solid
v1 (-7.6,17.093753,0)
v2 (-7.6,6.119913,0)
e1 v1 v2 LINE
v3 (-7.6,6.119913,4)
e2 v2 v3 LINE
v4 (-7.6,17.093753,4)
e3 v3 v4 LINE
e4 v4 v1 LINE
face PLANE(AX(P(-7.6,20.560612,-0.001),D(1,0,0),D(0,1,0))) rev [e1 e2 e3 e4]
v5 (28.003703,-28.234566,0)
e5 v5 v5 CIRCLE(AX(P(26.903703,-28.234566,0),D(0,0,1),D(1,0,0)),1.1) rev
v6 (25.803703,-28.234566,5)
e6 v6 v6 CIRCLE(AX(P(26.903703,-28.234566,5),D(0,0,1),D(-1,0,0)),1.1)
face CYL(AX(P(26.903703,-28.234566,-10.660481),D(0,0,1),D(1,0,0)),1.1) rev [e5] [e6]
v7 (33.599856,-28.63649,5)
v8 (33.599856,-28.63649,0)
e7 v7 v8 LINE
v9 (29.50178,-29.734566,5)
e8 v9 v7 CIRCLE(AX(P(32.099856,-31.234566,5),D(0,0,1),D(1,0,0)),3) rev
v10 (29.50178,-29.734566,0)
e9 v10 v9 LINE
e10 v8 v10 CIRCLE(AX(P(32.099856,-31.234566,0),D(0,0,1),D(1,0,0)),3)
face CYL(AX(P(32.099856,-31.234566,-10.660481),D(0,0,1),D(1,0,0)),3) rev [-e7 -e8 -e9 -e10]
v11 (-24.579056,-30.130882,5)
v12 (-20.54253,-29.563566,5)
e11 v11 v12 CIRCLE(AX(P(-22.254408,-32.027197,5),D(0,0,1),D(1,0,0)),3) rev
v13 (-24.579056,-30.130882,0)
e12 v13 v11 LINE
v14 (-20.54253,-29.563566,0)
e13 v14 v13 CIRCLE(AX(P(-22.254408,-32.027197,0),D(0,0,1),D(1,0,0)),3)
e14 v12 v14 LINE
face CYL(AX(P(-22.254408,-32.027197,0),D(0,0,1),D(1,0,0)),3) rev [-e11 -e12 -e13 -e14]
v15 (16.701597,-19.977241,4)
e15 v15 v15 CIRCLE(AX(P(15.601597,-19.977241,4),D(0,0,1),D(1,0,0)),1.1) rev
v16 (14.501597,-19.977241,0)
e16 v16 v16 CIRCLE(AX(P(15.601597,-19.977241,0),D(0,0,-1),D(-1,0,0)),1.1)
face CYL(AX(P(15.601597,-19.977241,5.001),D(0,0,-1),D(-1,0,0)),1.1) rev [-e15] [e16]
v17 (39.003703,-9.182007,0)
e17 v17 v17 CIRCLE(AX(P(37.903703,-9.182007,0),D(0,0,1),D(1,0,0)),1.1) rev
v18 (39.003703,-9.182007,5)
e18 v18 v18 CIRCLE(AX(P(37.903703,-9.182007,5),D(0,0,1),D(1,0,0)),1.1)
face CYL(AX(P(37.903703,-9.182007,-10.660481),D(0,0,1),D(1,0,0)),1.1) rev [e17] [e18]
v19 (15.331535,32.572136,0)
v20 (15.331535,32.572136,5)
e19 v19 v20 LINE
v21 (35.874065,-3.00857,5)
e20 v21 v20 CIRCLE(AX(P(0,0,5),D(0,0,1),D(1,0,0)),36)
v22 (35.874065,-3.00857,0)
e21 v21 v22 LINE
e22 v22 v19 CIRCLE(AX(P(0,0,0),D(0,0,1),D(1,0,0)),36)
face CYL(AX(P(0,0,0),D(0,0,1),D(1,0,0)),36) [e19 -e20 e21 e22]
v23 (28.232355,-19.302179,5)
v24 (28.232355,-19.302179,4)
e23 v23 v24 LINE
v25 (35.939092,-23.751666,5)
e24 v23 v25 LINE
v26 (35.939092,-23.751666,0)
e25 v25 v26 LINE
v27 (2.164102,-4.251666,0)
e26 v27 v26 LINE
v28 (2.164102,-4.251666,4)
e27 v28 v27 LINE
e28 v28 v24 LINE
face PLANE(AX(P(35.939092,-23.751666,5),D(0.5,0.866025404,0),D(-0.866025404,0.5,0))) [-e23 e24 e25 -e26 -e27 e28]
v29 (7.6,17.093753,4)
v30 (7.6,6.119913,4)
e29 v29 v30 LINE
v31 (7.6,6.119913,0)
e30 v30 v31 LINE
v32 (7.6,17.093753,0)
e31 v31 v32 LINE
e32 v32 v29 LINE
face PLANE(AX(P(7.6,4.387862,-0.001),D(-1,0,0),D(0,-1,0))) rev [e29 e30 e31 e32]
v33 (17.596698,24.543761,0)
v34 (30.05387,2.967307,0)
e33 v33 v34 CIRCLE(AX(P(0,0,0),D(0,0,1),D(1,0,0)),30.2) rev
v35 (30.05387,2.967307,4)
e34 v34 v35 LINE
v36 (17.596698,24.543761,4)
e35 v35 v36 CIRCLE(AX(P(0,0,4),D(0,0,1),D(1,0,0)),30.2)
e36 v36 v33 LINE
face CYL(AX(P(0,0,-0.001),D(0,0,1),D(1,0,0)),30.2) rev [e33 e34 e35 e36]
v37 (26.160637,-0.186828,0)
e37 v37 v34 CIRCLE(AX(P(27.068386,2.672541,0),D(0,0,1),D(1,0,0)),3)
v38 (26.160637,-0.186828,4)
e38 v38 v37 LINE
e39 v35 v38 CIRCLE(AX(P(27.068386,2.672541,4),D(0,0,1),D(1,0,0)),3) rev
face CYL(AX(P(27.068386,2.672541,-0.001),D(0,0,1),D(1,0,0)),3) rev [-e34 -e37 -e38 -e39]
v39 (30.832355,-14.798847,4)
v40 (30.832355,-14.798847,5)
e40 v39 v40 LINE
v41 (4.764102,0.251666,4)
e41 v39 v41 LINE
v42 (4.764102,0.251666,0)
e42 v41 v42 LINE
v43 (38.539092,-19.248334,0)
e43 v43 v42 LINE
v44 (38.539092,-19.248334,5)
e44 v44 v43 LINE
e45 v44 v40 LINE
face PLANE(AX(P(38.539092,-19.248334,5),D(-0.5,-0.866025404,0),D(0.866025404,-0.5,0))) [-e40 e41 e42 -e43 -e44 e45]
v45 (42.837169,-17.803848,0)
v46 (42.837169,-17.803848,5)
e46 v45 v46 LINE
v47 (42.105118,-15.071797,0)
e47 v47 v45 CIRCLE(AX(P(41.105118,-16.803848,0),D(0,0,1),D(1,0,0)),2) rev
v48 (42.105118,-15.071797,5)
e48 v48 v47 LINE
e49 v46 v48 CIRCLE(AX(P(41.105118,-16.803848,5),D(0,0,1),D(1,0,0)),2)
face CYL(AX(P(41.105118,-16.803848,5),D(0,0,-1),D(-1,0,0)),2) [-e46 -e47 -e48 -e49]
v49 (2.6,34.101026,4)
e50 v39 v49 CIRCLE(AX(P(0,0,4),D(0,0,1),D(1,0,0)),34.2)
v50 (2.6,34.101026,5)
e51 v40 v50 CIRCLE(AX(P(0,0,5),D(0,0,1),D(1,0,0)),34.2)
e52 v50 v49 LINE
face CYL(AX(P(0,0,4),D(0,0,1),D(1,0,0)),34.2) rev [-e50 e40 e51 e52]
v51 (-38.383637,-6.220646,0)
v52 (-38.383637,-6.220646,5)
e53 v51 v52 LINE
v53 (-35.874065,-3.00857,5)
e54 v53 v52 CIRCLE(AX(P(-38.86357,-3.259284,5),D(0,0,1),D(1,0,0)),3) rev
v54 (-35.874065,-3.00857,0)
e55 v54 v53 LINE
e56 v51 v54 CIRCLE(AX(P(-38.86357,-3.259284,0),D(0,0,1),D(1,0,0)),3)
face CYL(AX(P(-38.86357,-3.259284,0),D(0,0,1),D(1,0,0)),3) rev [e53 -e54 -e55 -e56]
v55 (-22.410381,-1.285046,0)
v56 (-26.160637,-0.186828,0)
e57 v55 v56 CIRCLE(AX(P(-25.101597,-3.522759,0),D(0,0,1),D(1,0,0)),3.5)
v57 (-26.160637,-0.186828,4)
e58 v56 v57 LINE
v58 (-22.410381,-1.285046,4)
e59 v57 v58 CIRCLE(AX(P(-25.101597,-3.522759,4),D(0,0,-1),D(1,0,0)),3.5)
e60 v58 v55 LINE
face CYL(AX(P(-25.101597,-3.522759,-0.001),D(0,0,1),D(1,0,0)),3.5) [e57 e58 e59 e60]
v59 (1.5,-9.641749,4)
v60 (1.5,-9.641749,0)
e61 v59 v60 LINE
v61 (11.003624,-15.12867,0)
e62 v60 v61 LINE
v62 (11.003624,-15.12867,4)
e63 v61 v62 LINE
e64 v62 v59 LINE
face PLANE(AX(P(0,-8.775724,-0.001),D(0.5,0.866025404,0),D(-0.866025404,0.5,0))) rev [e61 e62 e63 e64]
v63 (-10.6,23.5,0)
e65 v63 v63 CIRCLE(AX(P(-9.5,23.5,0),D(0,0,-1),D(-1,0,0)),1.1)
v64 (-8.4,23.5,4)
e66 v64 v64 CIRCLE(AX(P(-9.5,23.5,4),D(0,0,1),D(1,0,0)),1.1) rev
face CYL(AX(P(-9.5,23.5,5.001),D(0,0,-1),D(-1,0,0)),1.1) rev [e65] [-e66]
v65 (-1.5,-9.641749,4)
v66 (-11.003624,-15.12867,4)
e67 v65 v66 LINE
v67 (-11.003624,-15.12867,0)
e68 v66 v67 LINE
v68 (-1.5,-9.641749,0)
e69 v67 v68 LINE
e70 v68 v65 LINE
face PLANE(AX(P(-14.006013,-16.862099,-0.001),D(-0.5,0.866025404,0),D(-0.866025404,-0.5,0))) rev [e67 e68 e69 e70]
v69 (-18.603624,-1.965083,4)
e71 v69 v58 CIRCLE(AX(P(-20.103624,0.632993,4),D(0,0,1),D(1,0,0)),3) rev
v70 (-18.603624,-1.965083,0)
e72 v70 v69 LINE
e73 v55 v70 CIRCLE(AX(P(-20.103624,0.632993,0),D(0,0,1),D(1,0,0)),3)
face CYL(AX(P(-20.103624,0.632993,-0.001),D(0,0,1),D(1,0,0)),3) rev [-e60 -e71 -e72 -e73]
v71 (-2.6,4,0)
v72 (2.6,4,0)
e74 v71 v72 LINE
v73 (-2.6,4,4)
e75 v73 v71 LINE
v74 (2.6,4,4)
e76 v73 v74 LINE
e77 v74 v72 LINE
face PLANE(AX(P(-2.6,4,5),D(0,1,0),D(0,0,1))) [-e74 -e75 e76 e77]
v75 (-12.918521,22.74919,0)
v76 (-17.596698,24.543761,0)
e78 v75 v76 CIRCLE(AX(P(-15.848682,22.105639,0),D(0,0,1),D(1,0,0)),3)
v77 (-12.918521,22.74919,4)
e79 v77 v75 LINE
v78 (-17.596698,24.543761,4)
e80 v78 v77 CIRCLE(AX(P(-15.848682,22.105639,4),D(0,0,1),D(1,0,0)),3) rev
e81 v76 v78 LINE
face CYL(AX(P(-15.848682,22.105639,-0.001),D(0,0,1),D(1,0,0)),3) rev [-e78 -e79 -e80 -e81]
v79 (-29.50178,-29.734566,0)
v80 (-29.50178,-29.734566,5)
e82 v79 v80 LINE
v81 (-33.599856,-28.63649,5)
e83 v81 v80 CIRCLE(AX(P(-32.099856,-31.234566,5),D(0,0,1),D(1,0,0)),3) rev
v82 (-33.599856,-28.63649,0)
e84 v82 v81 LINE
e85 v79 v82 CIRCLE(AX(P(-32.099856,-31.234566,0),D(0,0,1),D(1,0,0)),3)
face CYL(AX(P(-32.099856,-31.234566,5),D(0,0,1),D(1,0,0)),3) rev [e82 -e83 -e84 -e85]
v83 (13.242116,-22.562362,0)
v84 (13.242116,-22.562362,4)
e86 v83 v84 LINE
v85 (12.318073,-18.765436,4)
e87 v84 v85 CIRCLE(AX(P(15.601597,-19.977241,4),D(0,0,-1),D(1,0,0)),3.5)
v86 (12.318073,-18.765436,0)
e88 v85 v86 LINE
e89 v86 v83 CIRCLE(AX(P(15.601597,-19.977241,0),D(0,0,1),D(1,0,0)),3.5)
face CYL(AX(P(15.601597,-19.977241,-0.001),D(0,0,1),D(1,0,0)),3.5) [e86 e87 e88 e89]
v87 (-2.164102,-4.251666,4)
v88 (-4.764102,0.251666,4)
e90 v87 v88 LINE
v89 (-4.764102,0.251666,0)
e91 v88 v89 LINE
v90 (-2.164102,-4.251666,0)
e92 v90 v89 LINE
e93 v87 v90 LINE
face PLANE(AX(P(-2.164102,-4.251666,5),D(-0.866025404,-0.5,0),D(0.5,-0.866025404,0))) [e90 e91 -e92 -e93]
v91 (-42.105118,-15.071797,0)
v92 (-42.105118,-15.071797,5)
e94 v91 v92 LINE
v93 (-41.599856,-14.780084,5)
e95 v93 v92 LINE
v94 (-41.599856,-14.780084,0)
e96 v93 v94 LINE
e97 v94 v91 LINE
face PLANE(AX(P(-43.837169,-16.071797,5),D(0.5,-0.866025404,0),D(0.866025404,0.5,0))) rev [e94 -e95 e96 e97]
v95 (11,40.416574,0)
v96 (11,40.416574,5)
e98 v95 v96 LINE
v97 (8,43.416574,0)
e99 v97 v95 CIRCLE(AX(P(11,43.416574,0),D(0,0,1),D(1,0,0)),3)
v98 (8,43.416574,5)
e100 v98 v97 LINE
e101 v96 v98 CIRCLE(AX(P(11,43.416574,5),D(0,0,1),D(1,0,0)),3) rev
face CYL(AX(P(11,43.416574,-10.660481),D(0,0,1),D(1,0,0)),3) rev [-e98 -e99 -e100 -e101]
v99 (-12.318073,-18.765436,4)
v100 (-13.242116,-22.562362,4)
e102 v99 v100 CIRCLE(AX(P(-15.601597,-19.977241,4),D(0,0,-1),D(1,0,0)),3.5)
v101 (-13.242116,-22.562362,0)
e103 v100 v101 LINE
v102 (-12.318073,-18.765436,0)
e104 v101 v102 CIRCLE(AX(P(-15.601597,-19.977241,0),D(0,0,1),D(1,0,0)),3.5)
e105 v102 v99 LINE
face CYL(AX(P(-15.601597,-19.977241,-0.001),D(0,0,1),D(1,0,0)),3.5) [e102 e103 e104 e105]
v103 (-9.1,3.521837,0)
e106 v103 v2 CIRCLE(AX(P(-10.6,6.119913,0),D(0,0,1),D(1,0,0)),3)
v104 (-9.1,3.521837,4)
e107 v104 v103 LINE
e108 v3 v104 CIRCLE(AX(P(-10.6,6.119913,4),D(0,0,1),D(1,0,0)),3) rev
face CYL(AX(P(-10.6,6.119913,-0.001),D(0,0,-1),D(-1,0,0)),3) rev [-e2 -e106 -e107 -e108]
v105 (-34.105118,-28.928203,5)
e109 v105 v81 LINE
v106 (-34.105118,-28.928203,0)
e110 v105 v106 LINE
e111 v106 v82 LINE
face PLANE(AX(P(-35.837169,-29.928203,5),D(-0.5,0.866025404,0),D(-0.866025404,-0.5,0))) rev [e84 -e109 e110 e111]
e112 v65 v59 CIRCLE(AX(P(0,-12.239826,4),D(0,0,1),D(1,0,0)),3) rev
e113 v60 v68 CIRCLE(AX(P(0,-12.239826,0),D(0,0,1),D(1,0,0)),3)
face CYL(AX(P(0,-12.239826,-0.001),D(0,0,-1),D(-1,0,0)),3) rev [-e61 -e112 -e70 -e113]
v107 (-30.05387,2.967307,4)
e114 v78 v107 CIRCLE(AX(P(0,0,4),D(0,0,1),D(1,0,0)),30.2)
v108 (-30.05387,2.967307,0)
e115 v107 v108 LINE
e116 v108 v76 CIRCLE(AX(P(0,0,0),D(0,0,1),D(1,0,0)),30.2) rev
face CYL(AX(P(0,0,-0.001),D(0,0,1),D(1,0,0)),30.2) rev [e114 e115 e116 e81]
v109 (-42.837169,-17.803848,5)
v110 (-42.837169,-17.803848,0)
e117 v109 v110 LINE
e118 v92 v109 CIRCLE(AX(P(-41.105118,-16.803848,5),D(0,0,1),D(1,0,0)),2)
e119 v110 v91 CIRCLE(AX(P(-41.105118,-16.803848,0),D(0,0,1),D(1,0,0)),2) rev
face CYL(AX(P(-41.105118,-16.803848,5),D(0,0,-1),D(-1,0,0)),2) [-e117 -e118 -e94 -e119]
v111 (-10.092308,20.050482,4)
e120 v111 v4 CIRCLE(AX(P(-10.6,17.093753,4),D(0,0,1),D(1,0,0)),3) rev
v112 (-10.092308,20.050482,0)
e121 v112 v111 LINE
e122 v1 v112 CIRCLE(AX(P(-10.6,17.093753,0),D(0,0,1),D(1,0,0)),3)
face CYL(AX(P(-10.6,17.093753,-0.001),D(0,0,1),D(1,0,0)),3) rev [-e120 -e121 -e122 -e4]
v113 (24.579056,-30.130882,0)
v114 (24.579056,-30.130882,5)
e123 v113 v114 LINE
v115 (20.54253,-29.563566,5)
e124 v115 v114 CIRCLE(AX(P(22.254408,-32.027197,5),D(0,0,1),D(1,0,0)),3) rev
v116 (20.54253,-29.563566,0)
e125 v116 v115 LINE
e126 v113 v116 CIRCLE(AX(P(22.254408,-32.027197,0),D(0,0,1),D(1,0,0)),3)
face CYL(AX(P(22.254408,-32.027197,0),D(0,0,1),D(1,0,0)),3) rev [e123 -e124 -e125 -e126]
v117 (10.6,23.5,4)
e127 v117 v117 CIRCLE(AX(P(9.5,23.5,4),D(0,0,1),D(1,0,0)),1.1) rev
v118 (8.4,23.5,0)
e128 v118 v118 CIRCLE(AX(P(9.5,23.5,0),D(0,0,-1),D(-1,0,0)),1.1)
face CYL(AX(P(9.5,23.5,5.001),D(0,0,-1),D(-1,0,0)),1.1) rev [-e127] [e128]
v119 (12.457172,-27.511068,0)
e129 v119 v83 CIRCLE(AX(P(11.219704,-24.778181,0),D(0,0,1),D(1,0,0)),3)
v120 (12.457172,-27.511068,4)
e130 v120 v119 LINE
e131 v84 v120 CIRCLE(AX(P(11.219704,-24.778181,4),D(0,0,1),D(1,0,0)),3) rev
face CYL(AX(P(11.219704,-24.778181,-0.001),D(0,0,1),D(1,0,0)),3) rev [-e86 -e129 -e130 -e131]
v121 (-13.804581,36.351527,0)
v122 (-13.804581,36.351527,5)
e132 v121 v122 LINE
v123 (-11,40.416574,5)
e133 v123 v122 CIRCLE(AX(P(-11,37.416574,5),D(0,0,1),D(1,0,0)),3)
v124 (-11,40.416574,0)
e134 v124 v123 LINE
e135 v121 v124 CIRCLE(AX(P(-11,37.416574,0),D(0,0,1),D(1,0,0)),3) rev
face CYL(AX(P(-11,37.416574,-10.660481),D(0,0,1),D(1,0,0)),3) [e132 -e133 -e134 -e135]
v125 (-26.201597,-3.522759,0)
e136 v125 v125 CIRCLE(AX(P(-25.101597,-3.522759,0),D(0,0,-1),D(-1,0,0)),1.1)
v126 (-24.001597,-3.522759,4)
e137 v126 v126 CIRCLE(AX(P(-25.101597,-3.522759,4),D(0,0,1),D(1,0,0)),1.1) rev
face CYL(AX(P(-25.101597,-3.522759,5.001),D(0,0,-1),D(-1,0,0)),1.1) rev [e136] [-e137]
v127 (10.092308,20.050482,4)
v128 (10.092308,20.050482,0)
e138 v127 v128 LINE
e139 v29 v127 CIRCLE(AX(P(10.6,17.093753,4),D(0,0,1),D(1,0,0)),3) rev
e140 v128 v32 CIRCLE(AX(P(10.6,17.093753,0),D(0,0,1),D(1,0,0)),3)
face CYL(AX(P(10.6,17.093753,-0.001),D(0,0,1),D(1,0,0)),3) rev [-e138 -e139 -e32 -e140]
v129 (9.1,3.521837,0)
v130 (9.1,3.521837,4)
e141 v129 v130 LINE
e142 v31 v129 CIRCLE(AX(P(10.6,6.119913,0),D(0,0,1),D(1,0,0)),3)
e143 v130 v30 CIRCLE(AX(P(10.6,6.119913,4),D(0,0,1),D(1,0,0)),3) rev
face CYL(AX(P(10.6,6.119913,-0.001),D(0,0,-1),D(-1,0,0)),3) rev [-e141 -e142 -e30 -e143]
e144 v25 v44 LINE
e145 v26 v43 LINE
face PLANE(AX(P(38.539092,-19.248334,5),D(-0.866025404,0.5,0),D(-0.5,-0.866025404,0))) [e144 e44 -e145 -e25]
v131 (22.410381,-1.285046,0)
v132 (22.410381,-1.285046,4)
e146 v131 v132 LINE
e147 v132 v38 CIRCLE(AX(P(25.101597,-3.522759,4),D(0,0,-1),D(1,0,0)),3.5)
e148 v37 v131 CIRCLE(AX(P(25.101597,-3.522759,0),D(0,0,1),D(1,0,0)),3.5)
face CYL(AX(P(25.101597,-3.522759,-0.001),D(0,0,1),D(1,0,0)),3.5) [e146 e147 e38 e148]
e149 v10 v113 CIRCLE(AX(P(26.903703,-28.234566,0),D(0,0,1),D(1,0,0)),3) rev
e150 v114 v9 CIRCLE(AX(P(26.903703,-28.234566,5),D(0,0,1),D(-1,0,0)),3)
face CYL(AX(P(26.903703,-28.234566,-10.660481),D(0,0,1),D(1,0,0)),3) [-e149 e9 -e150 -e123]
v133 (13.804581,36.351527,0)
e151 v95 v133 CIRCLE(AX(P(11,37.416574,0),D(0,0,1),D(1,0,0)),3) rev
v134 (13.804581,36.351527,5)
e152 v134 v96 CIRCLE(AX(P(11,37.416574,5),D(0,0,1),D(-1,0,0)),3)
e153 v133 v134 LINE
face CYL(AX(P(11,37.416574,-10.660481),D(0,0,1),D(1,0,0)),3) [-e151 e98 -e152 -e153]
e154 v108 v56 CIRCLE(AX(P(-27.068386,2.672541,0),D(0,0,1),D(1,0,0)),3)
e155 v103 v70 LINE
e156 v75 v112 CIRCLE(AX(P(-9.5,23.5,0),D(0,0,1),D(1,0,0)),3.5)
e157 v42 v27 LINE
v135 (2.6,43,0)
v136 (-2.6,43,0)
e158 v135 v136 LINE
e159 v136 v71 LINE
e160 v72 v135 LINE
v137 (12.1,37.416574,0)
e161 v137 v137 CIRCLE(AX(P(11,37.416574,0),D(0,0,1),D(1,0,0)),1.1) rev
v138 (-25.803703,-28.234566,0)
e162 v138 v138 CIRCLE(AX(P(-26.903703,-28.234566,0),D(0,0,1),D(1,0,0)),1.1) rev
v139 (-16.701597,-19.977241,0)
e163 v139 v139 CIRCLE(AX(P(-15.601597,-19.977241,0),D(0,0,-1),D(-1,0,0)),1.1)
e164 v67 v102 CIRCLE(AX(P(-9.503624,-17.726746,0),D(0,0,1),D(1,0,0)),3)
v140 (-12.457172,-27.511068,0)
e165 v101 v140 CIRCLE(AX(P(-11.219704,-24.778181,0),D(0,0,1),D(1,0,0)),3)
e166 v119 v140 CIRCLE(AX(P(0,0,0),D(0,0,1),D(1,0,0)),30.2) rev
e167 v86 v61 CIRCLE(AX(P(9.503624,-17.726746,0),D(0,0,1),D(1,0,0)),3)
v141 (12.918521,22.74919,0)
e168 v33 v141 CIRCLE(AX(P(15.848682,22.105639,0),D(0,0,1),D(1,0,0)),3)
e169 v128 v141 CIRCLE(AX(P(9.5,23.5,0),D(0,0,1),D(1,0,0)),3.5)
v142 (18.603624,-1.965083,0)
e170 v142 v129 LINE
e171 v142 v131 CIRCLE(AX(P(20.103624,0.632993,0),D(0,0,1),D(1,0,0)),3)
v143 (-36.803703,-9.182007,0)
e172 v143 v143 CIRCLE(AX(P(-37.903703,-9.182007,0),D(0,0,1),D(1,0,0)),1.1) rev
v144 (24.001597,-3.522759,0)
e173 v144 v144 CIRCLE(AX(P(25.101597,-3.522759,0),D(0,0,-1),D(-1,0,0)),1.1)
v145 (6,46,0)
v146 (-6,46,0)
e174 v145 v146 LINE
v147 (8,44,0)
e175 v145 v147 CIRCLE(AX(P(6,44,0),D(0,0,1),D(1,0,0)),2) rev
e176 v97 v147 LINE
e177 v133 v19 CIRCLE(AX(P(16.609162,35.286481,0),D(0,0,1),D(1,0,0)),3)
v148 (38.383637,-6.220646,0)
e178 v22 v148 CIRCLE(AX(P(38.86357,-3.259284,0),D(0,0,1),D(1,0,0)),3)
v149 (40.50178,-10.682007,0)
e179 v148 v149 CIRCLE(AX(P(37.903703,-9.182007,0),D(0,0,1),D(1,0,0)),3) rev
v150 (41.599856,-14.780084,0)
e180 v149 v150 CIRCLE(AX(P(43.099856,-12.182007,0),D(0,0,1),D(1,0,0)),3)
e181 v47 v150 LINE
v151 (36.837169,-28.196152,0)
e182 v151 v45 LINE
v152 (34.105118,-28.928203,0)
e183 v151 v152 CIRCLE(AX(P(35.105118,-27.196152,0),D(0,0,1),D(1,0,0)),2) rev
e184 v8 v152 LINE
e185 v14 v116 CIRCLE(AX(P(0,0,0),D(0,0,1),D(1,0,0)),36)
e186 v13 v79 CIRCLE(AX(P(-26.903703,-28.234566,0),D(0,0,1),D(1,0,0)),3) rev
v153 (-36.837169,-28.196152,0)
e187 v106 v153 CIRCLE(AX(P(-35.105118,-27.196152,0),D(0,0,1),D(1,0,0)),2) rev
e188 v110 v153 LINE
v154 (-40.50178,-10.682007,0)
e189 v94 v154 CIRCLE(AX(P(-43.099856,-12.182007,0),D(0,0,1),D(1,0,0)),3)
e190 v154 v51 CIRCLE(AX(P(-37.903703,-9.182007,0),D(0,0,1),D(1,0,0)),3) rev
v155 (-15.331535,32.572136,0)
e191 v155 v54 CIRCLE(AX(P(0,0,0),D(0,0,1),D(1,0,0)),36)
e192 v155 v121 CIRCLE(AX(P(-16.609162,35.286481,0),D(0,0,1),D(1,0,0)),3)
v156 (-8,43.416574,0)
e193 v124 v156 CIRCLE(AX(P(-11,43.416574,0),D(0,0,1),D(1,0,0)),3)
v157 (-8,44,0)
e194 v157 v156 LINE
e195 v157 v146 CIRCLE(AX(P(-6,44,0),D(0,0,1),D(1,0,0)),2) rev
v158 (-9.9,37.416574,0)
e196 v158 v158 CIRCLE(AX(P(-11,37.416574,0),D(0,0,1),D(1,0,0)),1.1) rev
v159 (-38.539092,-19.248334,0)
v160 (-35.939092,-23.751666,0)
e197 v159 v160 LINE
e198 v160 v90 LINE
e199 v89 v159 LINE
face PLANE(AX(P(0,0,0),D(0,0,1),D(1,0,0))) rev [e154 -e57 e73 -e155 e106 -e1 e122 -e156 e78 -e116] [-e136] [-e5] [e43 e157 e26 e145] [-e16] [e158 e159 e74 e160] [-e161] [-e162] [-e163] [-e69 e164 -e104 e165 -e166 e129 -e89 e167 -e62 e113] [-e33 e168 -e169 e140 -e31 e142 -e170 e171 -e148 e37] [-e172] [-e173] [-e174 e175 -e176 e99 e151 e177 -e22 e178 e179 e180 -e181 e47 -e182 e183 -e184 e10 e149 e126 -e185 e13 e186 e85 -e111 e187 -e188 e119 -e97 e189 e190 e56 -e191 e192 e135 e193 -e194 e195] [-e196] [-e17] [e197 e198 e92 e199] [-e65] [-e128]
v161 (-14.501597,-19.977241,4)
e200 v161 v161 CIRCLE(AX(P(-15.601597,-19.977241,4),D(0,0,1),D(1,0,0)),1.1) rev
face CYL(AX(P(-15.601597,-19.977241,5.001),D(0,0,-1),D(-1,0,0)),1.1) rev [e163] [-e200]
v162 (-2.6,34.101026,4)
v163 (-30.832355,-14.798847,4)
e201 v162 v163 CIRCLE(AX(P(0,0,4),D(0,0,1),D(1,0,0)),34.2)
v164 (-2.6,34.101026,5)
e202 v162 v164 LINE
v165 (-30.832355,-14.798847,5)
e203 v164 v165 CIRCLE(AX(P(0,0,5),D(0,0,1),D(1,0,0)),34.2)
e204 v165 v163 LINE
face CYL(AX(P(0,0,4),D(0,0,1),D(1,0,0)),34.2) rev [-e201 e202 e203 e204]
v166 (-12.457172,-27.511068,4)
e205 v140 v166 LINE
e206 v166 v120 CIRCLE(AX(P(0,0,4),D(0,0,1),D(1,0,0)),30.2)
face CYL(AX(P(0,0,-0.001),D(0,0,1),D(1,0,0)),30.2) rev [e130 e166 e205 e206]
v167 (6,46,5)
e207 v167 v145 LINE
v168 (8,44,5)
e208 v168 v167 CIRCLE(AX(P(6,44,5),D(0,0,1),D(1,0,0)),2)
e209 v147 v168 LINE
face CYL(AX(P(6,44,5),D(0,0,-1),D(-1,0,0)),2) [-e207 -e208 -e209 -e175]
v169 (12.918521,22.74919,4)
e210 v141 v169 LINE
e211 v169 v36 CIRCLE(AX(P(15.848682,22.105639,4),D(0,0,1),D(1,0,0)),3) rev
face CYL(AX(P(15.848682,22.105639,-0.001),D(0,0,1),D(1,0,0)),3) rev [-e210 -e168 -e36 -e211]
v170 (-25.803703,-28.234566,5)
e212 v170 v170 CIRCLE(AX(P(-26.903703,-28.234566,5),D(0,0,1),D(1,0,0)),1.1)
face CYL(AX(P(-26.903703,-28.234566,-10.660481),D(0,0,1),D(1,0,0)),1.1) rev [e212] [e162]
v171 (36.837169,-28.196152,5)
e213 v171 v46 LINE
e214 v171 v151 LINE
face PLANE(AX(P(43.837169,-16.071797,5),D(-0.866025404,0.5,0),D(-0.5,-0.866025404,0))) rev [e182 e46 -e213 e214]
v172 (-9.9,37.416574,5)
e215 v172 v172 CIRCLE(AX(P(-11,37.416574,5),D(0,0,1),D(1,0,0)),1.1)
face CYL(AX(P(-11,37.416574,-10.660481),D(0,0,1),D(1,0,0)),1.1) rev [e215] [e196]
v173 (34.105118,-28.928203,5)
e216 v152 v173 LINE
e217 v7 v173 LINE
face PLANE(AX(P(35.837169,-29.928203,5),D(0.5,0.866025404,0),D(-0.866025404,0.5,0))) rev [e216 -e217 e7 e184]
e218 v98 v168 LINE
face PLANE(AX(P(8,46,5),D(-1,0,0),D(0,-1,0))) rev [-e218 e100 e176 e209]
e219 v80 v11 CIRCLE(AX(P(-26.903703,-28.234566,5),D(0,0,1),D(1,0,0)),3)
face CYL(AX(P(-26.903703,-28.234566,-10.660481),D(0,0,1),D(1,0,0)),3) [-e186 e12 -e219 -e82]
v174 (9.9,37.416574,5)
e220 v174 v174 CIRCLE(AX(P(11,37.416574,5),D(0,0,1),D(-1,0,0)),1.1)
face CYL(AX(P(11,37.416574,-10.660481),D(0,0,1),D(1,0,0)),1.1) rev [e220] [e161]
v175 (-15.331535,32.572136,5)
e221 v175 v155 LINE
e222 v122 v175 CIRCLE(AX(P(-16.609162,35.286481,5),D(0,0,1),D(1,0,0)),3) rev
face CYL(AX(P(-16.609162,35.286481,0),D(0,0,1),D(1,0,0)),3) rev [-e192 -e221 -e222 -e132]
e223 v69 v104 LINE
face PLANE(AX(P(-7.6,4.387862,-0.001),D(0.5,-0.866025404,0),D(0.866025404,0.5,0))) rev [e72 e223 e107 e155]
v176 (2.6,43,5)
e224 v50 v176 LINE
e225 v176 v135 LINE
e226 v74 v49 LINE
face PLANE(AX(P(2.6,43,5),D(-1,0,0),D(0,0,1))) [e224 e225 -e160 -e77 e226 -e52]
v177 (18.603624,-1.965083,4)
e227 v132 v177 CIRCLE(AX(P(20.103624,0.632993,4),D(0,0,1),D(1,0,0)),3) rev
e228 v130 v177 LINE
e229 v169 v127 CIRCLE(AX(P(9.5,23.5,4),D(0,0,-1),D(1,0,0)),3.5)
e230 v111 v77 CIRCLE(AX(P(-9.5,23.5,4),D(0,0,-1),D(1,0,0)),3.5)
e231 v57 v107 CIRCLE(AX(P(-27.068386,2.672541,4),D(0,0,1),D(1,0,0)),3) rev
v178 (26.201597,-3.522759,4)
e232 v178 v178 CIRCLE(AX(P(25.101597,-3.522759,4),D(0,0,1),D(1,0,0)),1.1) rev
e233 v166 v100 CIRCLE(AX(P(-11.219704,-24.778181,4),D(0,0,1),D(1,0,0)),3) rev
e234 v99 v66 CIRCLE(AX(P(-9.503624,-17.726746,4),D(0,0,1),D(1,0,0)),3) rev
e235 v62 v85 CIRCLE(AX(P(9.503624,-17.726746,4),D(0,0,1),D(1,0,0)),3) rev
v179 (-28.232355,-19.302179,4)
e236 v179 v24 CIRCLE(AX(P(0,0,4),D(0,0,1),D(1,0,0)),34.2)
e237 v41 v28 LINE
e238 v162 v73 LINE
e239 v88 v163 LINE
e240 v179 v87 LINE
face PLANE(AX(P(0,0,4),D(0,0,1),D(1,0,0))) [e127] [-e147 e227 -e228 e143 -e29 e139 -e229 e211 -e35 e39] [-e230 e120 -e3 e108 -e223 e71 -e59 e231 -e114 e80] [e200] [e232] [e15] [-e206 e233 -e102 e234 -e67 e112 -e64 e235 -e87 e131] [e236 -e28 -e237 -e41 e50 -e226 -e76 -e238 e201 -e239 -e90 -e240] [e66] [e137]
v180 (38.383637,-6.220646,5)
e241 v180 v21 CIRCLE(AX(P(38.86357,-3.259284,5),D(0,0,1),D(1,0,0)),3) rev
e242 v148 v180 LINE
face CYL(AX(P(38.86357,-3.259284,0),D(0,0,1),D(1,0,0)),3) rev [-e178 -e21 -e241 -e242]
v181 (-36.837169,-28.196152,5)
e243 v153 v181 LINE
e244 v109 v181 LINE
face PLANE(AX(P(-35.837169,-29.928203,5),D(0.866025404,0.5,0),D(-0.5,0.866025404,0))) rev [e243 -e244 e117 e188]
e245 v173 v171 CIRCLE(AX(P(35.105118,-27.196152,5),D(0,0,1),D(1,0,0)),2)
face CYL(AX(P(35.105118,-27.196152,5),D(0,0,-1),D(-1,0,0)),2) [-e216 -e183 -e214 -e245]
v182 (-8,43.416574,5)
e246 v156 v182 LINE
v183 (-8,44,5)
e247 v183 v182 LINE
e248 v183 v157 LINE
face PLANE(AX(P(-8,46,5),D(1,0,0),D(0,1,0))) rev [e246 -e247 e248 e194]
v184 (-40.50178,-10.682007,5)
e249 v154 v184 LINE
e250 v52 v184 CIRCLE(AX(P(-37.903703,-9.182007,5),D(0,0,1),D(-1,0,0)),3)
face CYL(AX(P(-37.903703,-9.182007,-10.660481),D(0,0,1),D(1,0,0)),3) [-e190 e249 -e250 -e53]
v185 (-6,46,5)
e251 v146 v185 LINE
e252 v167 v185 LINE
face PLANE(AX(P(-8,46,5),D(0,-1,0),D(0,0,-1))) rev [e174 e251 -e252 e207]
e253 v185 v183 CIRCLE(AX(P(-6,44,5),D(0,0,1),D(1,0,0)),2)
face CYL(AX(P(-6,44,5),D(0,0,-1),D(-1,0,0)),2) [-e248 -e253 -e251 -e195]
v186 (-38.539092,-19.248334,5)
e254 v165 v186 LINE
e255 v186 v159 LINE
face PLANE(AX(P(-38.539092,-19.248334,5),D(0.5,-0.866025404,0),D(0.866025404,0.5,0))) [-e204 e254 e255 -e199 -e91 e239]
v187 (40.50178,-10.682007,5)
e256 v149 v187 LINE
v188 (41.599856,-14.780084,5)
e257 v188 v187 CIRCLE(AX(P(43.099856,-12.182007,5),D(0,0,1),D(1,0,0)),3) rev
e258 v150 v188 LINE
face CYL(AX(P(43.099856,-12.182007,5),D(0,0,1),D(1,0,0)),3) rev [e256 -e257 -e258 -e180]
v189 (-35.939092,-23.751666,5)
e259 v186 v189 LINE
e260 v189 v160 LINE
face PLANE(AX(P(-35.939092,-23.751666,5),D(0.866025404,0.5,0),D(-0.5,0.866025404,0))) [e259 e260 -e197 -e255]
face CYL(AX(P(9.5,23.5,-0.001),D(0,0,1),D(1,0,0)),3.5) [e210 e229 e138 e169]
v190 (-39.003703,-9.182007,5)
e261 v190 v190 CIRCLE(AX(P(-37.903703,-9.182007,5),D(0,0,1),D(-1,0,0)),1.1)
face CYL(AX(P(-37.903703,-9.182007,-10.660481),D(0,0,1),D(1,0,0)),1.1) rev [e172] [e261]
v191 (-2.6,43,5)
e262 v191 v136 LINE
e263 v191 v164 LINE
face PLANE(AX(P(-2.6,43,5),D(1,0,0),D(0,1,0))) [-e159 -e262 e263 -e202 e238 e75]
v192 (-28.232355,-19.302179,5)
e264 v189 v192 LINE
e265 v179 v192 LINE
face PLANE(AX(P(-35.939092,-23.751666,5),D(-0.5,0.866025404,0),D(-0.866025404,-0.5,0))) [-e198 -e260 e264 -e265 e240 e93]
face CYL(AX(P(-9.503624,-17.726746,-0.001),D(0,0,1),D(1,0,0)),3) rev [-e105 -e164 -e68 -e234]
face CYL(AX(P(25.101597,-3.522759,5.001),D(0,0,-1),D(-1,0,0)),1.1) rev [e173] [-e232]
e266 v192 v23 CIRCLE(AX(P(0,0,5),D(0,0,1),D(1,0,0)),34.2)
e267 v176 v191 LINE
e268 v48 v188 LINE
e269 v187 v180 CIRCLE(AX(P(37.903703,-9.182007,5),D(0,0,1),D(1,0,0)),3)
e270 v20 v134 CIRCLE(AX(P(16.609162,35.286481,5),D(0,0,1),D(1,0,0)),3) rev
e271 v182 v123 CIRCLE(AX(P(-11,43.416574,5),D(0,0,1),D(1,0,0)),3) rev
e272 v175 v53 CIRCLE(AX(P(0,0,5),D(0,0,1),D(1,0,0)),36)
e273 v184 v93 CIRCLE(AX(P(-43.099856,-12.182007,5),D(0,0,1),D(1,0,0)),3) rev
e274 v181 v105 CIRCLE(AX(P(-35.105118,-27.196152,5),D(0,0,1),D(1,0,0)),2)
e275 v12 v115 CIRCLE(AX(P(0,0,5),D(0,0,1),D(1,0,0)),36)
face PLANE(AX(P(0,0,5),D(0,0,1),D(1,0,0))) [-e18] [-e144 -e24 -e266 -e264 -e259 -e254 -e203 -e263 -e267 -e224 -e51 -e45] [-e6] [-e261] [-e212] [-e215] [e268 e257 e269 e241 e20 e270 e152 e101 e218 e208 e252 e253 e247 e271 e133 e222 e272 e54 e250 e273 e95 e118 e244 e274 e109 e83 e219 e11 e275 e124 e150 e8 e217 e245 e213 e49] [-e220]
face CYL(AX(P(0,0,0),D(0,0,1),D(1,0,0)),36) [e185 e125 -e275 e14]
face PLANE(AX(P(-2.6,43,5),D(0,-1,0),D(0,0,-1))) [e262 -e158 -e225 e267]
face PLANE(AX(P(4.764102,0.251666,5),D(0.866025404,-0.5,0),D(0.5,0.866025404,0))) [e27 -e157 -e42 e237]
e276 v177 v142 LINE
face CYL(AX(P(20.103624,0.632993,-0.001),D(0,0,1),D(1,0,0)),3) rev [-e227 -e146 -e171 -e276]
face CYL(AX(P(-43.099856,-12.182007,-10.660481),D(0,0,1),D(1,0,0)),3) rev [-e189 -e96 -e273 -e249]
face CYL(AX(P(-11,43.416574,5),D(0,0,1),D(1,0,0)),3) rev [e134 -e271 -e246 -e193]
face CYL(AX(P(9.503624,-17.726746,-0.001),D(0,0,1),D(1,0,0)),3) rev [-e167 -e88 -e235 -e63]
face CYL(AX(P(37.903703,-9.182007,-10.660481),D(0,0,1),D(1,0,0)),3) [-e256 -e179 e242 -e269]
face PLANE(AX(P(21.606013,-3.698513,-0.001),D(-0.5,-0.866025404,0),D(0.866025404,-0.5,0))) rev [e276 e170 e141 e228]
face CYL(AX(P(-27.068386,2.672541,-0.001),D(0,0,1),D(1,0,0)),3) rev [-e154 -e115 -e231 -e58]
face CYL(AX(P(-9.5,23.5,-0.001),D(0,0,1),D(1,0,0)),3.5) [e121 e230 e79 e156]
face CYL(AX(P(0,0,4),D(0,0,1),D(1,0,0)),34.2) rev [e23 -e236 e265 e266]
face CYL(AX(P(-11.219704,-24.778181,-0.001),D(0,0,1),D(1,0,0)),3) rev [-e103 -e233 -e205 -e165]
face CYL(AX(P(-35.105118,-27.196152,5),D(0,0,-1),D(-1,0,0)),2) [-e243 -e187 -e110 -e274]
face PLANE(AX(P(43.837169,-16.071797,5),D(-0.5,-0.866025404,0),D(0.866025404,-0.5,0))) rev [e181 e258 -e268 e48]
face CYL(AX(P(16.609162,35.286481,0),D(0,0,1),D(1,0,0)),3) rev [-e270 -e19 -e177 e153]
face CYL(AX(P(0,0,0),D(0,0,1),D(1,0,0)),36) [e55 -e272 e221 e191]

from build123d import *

# Parameters (mm, degrees)
SKETCH1_W           = 5.2
SKETCH1_H           = 39
BOSS_EXTRUDE1_DEPTH = 5
BOSS_EXTRUDE2_DEPTH = 5
SKETCH3_R           = 34.2
CUT_EXTRUDE1_DEPTH  = 1
CUT_EXTRUDE2_REACH  = 65.739
SKETCH4_R           = 1.1
FILLET1_R           = 2
CUT_EXTRUDE3_REACH  = 65.167
FILLET2_R           = 3
SKETCH6_R           = 1.1
BOSS_EXTRUDE3_DEPTH = 5
FILLET3_R           = 3


with BuildPart() as part:
    # Sketch1 → Boss-Extrude1 (new body)
    with BuildSketch(Plane.XY):
        Polygon((-8, 46), (8, 46), (8, 35), (34.310889132, -10.57179677), (43.837168574, -16.07179677), (35.837168574, -29.92820323), (26.310889132, -24.42820323), (-26.310889132, -24.42820323), (-35.837168574, -29.92820323), (-43.837168574, -16.07179677), (-34.310889132, -10.57179677), (-8, 35), align=None)
        Polygon((4.764101615, 0.25166605), (2.164101615, -4.25166605), (35.939092363, -23.75166605), (38.539092363, -19.24833395), align=None, mode=Mode.SUBTRACT)
        with Locations((0, 23.5)):
            Rectangle(SKETCH1_W, SKETCH1_H, mode=Mode.SUBTRACT)
        Polygon((-2.164101615, -4.25166605), (-4.764101615, 0.25166605), (-38.539092363, -19.24833395), (-35.939092363, -23.75166605), align=None, mode=Mode.SUBTRACT)
    extrude(amount=BOSS_EXTRUDE1_DEPTH)

    # Sketch2 → Boss-Extrude2 (add)
    with BuildSketch(Plane.XY.offset(5)):
        with BuildLine():
            Line((34.310889132, -10.57179677), (8, 35))
            Line((8, 35), (8, 35.09985755))
            ThreePointArc((8, 35.09985755), (31.176914536, 18), (34.397368307, -10.621725545))
            Line((34.397368307, -10.621725545), (34.310889132, -10.57179677))
        make_face()
        with BuildLine():
            Line((-26.310889132, -24.42820323), (26.310889132, -24.42820323))
            Line((26.310889132, -24.42820323), (26.397368307, -24.478132005))
            ThreePointArc((26.397368307, -24.478132005), (0, -36), (-26.397368307, -24.478132005))
            Line((-26.397368307, -24.478132005), (-26.310889132, -24.42820323))
        make_face()
        with BuildLine():
            Line((-8, 35), (-34.310889132, -10.57179677))
            Line((-34.310889132, -10.57179677), (-34.397368307, -10.621725545))
            ThreePointArc((-34.397368307, -10.621725545), (-31.176914536, 18), (-8, 35.09985755))
            Line((-8, 35.09985755), (-8, 35))
        make_face()
    extrude(amount=-BOSS_EXTRUDE2_DEPTH)

    # Sketch3 → Cut-Extrude1 (cut)
    with BuildSketch(Plane.XY.offset(5)):
        Circle(SKETCH3_R)
    extrude(amount=-CUT_EXTRUDE1_DEPTH, mode=Mode.SUBTRACT)

    # Sketch4 → Cut-Extrude2 (cut, up to next)
    with BuildSketch(Plane(origin=(0, 0, 0), x_dir=(-1, 0, 0), z_dir=(0, 0, -1)), mode=Mode.PRIVATE) as cut_extrude2_sk1:
        with Locations((9.5, 23.5)):
            Circle(SKETCH4_R)
    cut_extrude2_tool1 = extrude(cut_extrude2_sk1.sketch, amount=-CUT_EXTRUDE2_REACH, mode=Mode.PRIVATE) & part.part
    # Sketch4 → Cut-Extrude2 (cut, up to next)
    with BuildSketch(Plane(origin=(0, 0, 0), x_dir=(-1, 0, 0), z_dir=(0, 0, -1)), mode=Mode.PRIVATE) as cut_extrude2_sk2:
        with Locations((-9.5, 23.5)):
            Circle(SKETCH4_R)
    cut_extrude2_tool2 = extrude(cut_extrude2_sk2.sketch, amount=-CUT_EXTRUDE2_REACH, mode=Mode.PRIVATE) & part.part
    # Sketch4 → Cut-Extrude2 (cut, up to next)
    with BuildSketch(Plane(origin=(0, 0, 0), x_dir=(-1, 0, 0), z_dir=(0, 0, -1)), mode=Mode.PRIVATE) as cut_extrude2_sk3:
        with Locations((-25.101596989, -3.522758664)):
            Circle(SKETCH4_R)
    cut_extrude2_tool3 = extrude(cut_extrude2_sk3.sketch, amount=-CUT_EXTRUDE2_REACH, mode=Mode.PRIVATE) & part.part
    # Sketch4 → Cut-Extrude2 (cut, up to next)
    with BuildSketch(Plane(origin=(0, 0, 0), x_dir=(-1, 0, 0), z_dir=(0, 0, -1)), mode=Mode.PRIVATE) as cut_extrude2_sk4:
        with Locations((-15.601596989, -19.977241336)):
            Circle(SKETCH4_R)
    cut_extrude2_tool4 = extrude(cut_extrude2_sk4.sketch, amount=-CUT_EXTRUDE2_REACH, mode=Mode.PRIVATE) & part.part
    # Sketch4 → Cut-Extrude2 (cut, up to next)
    with BuildSketch(Plane(origin=(0, 0, 0), x_dir=(-1, 0, 0), z_dir=(0, 0, -1)), mode=Mode.PRIVATE) as cut_extrude2_sk5:
        with Locations((15.601596989, -19.977241336)):
            Circle(SKETCH4_R)
    cut_extrude2_tool5 = extrude(cut_extrude2_sk5.sketch, amount=-CUT_EXTRUDE2_REACH, mode=Mode.PRIVATE) & part.part
    # Sketch4 → Cut-Extrude2 (cut, up to next)
    with BuildSketch(Plane(origin=(0, 0, 0), x_dir=(-1, 0, 0), z_dir=(0, 0, -1)), mode=Mode.PRIVATE) as cut_extrude2_sk6:
        with Locations((25.101596989, -3.522758664)):
            Circle(SKETCH4_R)
    cut_extrude2_tool6 = extrude(cut_extrude2_sk6.sketch, amount=-CUT_EXTRUDE2_REACH, mode=Mode.PRIVATE) & part.part
    add(cut_extrude2_tool1.solids().sort_by_distance((-9.5, 23.5, 0))[0], mode=Mode.SUBTRACT)
    add(cut_extrude2_tool2.solids().sort_by_distance((9.5, 23.5, 0))[0], mode=Mode.SUBTRACT)
    add(cut_extrude2_tool3.solids().sort_by_distance((25.101597, -3.522759, 0))[0], mode=Mode.SUBTRACT)
    add(cut_extrude2_tool4.solids().sort_by_distance((15.601597, -19.977241, 0))[0], mode=Mode.SUBTRACT)
    add(cut_extrude2_tool5.solids().sort_by_distance((-15.601597, -19.977241, 0))[0], mode=Mode.SUBTRACT)
    add(cut_extrude2_tool6.solids().sort_by_distance((-25.101597, -3.522759, 0))[0], mode=Mode.SUBTRACT)

    # Fillet1
    fillet1_edges = [part.edges().sort_by_distance(p)[0] for p in [
        (43.837168574, -16.07179677, 2.5),
        (35.837168574, -29.92820323, 2.5),
        (-35.837168574, -29.92820323, 2.5),
        (-43.837168574, -16.07179677, 2.5),
        (-8, 46, 2.5),
        (8, 46, 2.5),
    ]]
    fillet(fillet1_edges, radius=FILLET1_R)

    # Sketch5 → Cut-Extrude3 (cut, up to next)
    with BuildSketch(Plane.XY.offset(4), mode=Mode.PRIVATE) as cut_extrude3_sk1:
        with BuildLine():
            Line((0, -8.775724092), (14.006012577, -16.862099223))
            ThreePointArc((14.006012577, -16.862099223), (12.10270106, -19.889336396), (13.851596989, -23.008330249))
            Line((13.851596989, -23.008330249), (17.106778687, -24.887710279))
            ThreePointArc((17.106778687, -24.887710279), (0, -30.2), (-17.106778687, -24.887710279))
            Line((-17.106778687, -24.887710279), (-13.851596989, -23.008330249))
            ThreePointArc((-13.851596989, -23.008330249), (-12.10270106, -19.889336396), (-14.006012577, -16.862099223))
            Line((-14.006012577, -16.862099223), (0, -8.775724092))
        make_face()
    cut_extrude3_tool1 = extrude(cut_extrude3_sk1.sketch, amount=-CUT_EXTRUDE3_REACH, mode=Mode.PRIVATE) & part.part
    # Sketch5 → Cut-Extrude3 (cut, up to next)
    with BuildSketch(Plane.XY.offset(4), mode=Mode.PRIVATE) as cut_extrude3_sk2:
        with BuildLine():
            Line((-7.6, 4.387862046), (-21.606012577, -3.698513086))
            ThreePointArc((-21.606012577, -3.698513086), (-23.276021113, -0.536578375), (-26.851596989, -0.491669751))
            Line((-26.851596989, -0.491669751), (-30.106778687, -2.371049781))
            ThreePointArc((-30.106778687, -2.371049781), (-26.153967194, 15.1), (-13, 27.25876006))
            Line((-13, 27.25876006), (-13, 23.5))
            ThreePointArc((-13, 23.5), (-11.173320053, 20.42591477), (-7.6, 20.560612309))
            Line((-7.6, 20.560612309), (-7.6, 4.387862046))
        make_face()
    cut_extrude3_tool2 = extrude(cut_extrude3_sk2.sketch, amount=-CUT_EXTRUDE3_REACH, mode=Mode.PRIVATE) & part.part
    # Sketch5 → Cut-Extrude3 (cut, up to next)
    with BuildSketch(Plane.XY.offset(4), mode=Mode.PRIVATE) as cut_extrude3_sk3:
        with BuildLine():
            Line((7.6, 4.387862046), (7.6, 20.560612309))
            ThreePointArc((7.6, 20.560612309), (11.173320053, 20.42591477), (13, 23.5))
            Line((13, 23.5), (13, 27.25876006))
            ThreePointArc((13, 27.25876006), (26.153967194, 15.1), (30.106778687, -2.371049781))
            Line((30.106778687, -2.371049781), (26.851596989, -0.491669751))
            ThreePointArc((26.851596989, -0.491669751), (23.276021113, -0.536578375), (21.606012577, -3.698513086))
            Line((21.606012577, -3.698513086), (7.6, 4.387862046))
        make_face()
    cut_extrude3_tool3 = extrude(cut_extrude3_sk3.sketch, amount=-CUT_EXTRUDE3_REACH, mode=Mode.PRIVATE) & part.part
    add(cut_extrude3_tool1.solids().sort_by_distance((0, -20.951197, 4))[0], mode=Mode.SUBTRACT)
    add(cut_extrude3_tool2.solids().sort_by_distance((-18.144269, 10.475599, 4))[0], mode=Mode.SUBTRACT)
    add(cut_extrude3_tool3.solids().sort_by_distance((18.144269, 10.475599, 4))[0], mode=Mode.SUBTRACT)

    # Fillet2
    fillet2_edges = [part.edges().sort_by_distance(p)[0] for p in [
        (0, -8.775724092, 2),
        (14.006012577, -16.862099223, 2),
        (17.106778687, -24.887710279, 2),
        (-17.106778687, -24.887710279, 2),
        (-14.006012577, -16.862099223, 2),
        (13, 27.25876006, 2),
        (30.106778687, -2.371049781, 2),
        (21.606012577, -3.698513086, 2),
        (7.6, 4.387862046, 2),
        (7.6, 20.560612309, 2),
        (-30.106778687, -2.371049781, 2),
        (-21.606012577, -3.698513086, 2),
        (-7.6, 4.387862046, 2),
        (-7.6, 20.560612309, 2),
        (-13, 27.25876006, 2),
    ]]
    fillet(fillet2_edges, radius=FILLET2_R)

    # Sketch6 → Boss-Extrude3 (add)
    # profile 1 of 6: a face of its own
    with BuildSketch(Plane.XY.offset(5)):
        with BuildLine():
            Line((-11, 40.416573868), (-8, 40.416573868))
            Line((-8, 40.416573868), (-8, 35.09985755))
            ThreePointArc((-8, 35.09985755), (-10.415364961, 34.460414576), (-12.780558762, 33.654974636))
            Line((-12.780558762, 33.654974636), (-13.80458122, 36.351527304))
            ThreePointArc((-13.80458122, 36.351527304), (-13.469325788, 39.120225873), (-11, 40.416573868))
        make_face()
        with Locations((-11, 37.416573868)):
            Circle(SKETCH6_R, mode=Mode.SUBTRACT)
    # profile 2 of 6: a face of its own
    with BuildSketch(Plane.XY.offset(5)):
        with BuildLine():
            Line((8, 40.416573868), (8, 35.09985755))
            ThreePointArc((8, 35.09985755), (10.415364961, 34.460414576), (12.780558762, 33.654974636))
            Line((12.780558762, 33.654974636), (13.80458122, 36.351527304))
            ThreePointArc((13.80458122, 36.351527304), (13.469325788, 39.120225873), (11, 40.416573868))
            Line((11, 40.416573868), (8, 40.416573868))
        make_face()
        with Locations((11, 37.416573868)):
            Circle(SKETCH6_R, mode=Mode.SUBTRACT)
    # profile 3 of 6: a face of its own
    with BuildSketch(Plane.XY.offset(5)):
        with BuildLine():
            Line((40.501779703, -10.682007492), (39.001779703, -13.280083704))
            Line((39.001779703, -13.280083704), (34.397368307, -10.621725545))
            ThreePointArc((34.397368307, -10.621725545), (35.051276928, -8.210236642), (35.536342379, -5.759198755))
            Line((35.536342379, -5.759198755), (38.383636722, -6.220645627))
            ThreePointArc((38.383636722, -6.220645627), (40.613772302, -7.895334633), (40.501779703, -10.682007492))
        make_face()
        with Locations((37.903703492, -9.182007492)):
            Circle(SKETCH6_R, mode=Mode.SUBTRACT)
    # profile 4 of 6: a face of its own
    with BuildSketch(Plane.XY.offset(5)):
        with BuildLine():
            Line((31.001779703, -27.136490164), (26.397368307, -24.478132005))
            ThreePointArc((26.397368307, -24.478132005), (24.635911967, -26.250177934), (22.755783617, -27.89577588))
            Line((22.755783617, -27.89577588), (24.579055502, -30.130881677))
            ThreePointArc((24.579055502, -30.130881677), (27.144446514, -31.22489124), (29.501779703, -29.734566375))
            Line((29.501779703, -29.734566375), (31.001779703, -27.136490164))
        make_face()
        with Locations((26.903703492, -28.234566375)):
            Circle(SKETCH6_R, mode=Mode.SUBTRACT)
    # profile 5 of 6: a face of its own
    with BuildSketch(Plane.XY.offset(5)):
        with BuildLine():
            Line((-29.501779703, -29.734566375), (-31.001779703, -27.136490164))
            Line((-31.001779703, -27.136490164), (-26.397368307, -24.478132005))
            ThreePointArc((-26.397368307, -24.478132005), (-24.635911967, -26.250177934), (-22.755783617, -27.89577588))
            Line((-22.755783617, -27.89577588), (-24.579055502, -30.130881677))
            ThreePointArc((-24.579055502, -30.130881677), (-27.144446514, -31.22489124), (-29.501779703, -29.734566375))
        make_face()
        with Locations((-26.903703492, -28.234566375)):
            Circle(SKETCH6_R, mode=Mode.SUBTRACT)
    # profile 6 of 6: a face of its own
    with BuildSketch(Plane.XY.offset(5)):
        with BuildLine():
            Line((-39.001779703, -13.280083704), (-34.397368307, -10.621725545))
            ThreePointArc((-34.397368307, -10.621725545), (-35.051276928, -8.210236642), (-35.536342379, -5.759198755))
            Line((-35.536342379, -5.759198755), (-38.383636722, -6.220645627))
            ThreePointArc((-38.383636722, -6.220645627), (-40.613772302, -7.895334633), (-40.501779703, -10.682007492))
            Line((-40.501779703, -10.682007492), (-39.001779703, -13.280083704))
        make_face()
        with Locations((-37.903703492, -9.182007492)):
            Circle(SKETCH6_R, mode=Mode.SUBTRACT)
    extrude(amount=-BOSS_EXTRUDE3_DEPTH)

    # Fillet3
    fillet3_edges = [part.edges().sort_by_distance(p)[0] for p in [
        (12.780558762, 33.654974636, 2.5),
        (8, 40.416573868, 2.5),
        (-12.780558762, 33.654974636, 2.5),
        (-8, 40.416573868, 2.5),
        (-39.001779703, -13.280083704, 2.5),
        (-35.536342379, -5.759198755, 2.5),
        (39.001779703, -13.280083704, 2.5),
        (35.536342379, -5.759198755, 2.5),
        (31.001779703, -27.136490164, 2.5),
        (22.755783617, -27.89577588, 2.5),
        (-31.001779703, -27.136490164, 2.5),
        (-22.755783617, -27.89577588, 2.5),
    ]]
    fillet(fillet3_edges, radius=FILLET3_R - 0.0001)  # a hair under: the kernel refuses the full size


solid = part.part
